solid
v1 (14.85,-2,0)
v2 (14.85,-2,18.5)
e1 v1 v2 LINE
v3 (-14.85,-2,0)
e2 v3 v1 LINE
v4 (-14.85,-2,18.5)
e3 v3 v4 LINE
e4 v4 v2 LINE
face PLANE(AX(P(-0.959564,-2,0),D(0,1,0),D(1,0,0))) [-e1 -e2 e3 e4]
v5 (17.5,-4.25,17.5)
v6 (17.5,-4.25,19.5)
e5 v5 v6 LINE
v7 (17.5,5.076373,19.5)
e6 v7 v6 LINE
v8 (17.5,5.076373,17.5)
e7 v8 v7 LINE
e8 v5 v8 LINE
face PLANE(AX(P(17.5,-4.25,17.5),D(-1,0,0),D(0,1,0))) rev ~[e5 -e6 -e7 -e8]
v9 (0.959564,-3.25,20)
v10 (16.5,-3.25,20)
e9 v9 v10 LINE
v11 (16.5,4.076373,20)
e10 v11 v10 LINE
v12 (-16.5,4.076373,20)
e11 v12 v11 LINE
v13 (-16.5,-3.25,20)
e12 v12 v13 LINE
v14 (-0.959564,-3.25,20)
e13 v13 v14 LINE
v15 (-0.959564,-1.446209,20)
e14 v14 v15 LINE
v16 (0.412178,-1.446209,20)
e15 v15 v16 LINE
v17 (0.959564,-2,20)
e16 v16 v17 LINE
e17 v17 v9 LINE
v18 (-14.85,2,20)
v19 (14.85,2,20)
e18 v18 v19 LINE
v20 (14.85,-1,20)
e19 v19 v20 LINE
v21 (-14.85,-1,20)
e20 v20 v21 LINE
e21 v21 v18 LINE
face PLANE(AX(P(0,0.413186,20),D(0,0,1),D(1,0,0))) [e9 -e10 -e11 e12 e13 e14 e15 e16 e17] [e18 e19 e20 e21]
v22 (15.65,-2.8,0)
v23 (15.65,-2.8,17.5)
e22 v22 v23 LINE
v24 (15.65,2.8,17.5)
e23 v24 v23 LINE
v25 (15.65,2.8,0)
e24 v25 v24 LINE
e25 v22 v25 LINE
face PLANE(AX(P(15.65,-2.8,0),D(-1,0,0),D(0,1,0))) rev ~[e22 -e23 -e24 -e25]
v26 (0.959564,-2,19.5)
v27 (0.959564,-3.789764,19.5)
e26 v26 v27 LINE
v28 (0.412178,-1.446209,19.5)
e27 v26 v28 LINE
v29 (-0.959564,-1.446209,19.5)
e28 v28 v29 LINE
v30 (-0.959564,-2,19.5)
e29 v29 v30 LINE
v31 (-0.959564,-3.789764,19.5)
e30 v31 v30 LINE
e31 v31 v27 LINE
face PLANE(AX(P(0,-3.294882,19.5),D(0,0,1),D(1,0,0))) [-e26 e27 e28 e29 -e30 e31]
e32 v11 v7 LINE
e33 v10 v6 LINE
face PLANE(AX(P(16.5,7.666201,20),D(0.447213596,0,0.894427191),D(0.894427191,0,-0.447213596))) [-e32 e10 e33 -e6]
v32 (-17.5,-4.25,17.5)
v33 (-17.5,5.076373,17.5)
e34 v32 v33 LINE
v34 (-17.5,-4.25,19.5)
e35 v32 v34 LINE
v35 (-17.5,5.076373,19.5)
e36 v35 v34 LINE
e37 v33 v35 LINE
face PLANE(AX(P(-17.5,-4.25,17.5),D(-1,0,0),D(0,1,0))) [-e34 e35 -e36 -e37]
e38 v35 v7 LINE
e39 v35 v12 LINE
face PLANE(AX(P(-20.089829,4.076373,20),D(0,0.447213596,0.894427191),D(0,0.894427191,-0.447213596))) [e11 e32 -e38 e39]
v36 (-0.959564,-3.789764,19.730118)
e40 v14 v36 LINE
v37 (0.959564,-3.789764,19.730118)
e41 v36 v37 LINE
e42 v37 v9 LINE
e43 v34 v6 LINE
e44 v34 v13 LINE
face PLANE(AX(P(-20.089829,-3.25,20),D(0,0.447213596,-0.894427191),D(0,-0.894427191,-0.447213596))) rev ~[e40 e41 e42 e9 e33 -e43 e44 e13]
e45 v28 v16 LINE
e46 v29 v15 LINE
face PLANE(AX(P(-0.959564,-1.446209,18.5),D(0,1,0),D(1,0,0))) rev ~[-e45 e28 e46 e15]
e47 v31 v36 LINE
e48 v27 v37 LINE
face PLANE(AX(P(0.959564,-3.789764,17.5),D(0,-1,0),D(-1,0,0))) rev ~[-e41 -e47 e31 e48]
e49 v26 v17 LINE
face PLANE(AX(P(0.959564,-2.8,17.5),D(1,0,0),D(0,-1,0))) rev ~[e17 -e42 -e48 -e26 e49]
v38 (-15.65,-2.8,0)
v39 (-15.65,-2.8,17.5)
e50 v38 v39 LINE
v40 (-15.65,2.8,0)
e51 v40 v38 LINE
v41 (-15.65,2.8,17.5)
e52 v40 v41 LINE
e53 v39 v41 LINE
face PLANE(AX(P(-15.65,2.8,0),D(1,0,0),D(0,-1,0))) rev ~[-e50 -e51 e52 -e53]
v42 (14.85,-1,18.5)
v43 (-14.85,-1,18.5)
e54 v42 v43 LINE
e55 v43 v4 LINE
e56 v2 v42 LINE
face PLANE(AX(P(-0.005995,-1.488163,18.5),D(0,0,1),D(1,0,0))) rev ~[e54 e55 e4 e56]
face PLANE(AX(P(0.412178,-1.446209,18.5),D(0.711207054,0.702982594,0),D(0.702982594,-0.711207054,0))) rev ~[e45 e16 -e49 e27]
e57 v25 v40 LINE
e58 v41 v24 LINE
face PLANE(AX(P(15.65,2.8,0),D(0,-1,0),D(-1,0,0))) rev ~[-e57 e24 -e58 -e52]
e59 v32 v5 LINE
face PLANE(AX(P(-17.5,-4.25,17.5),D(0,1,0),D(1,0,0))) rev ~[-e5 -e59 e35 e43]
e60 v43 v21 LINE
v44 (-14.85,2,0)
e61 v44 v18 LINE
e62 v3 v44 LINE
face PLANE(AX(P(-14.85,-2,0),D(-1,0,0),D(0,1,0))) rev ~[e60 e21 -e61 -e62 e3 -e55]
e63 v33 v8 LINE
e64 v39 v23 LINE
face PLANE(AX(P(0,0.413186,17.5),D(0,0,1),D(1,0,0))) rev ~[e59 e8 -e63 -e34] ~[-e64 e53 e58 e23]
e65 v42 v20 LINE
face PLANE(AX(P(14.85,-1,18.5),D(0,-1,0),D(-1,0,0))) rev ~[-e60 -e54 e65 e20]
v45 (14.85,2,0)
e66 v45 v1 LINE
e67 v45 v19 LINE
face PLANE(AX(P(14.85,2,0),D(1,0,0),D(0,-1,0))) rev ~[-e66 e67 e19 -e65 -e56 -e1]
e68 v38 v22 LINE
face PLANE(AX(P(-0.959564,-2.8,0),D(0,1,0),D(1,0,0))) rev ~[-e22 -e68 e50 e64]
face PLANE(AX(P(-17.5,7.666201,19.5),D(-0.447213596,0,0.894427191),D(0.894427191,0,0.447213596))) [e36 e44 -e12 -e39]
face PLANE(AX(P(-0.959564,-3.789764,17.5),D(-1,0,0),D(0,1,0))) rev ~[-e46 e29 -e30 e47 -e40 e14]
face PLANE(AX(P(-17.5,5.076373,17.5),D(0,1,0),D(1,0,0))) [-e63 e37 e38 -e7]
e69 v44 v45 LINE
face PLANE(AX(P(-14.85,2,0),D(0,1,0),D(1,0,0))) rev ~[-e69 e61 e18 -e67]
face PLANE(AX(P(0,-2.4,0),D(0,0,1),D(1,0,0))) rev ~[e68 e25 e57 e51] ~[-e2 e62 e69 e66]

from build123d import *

# Parameters (mm, degrees)
F1_DEPTH    = 20
F2_START    = 18.5
F2_DEPTH    = 1.5
F3_START    = 17.5
F0_W        = 1.9191285201
F0_H        = 0.8
F3_DEPTH    = 2
F4_START    = 17.5
F0_H_2      = 0.9897637812
F4_DEPTH    = 2
F5_DEPTH    = 17.5
F6_DEPTH    = 18.5
F7_START    = 17.5
F0_W_2      = 35
F0_H_3      = 9.3263725303
F7_DEPTH    = 2.5
F8_T1_DEPTH = 40.1796577476
F8_T3_DEPTH = 14.5060302779


# Not quite as in the source:
# - a fillet or chamfer that OpenCascade refuses, or shapes differently, is made with other operations: its cross-section is extruded or revolved along the edge and cut away or added


with BuildPart() as f1:
    # F0 (on Top) → F1 (new body)
    with BuildSketch(Plane.XY):
        Polygon((-14.85, 2), (14.85, 2), (14.85, -1), (14.85, -2), (0.95956426, -2), (0.95956426, -2.8), (15.65, -2.8), (15.65, 2.8), (-15.65, 2.8), (-15.65, -2.8), (-0.95956426, -2.8), (-0.95956426, -2), (-14.85, -2), (-14.85, -1), align=None)
    extrude(amount=F1_DEPTH)

    # F0 (on Top) → F2 (join)
    with BuildSketch(Plane.XY.offset(F2_START)):
        Polygon((14.85, -2), (14.85, -1), (-14.85, -1), (-14.85, -2), (-0.95956426, -2), (-0.95956426, -1.4462094987), (0.4121778399, -1.4462094987), (0.95956426, -2), align=None)
    extrude(amount=F2_DEPTH)

    # F0 (on Top) → F3 (join)
    with BuildSketch(Plane.XY.offset(F3_START)):
        with Locations((0, -2.4)):
            Rectangle(F0_W, F0_H)
        Polygon((-0.95956426, -2), (0.95956426, -2), (0.4121778399, -1.4462094987), (-0.95956426, -1.4462094987), align=None)
    extrude(amount=F3_DEPTH)

    # F0 (on Top) → F4 (join)
    with BuildSketch(Plane.XY.offset(F4_START)):
        with Locations((0, -3.2948818906)):
            Rectangle(F0_W, F0_H_2)
    extrude(amount=F4_DEPTH)

    # F0 (on Top) → F5 (join)
    with BuildSketch(Plane.XY):
        with Locations((0, -2.4)):
            Rectangle(F0_W, F0_H)
    extrude(amount=F5_DEPTH)

    # F0 (on Top) → F6 (cut)
    with BuildSketch(Plane.XY):
        Polygon((-0.95956426, -2), (0.95956426, -2), (0.4121778399, -1.4462094987), (-0.95956426, -1.4462094987), align=None)
    extrude(amount=F6_DEPTH, mode=Mode.SUBTRACT)

    # F0 (on Top) → F7 (join)
    with BuildSketch(Plane.XY.offset(F7_START)):
        with Locations((0, 0.4131862652)):
            Rectangle(F0_W_2, F0_H_3)
        Polygon((15.65, -2.8), (0.95956426, -2.8), (0.95956426, -3.7897637812), (-0.95956426, -3.7897637812), (-0.95956426, -2.8), (-15.65, -2.8), (-15.65, 2.8), (15.65, 2.8), align=None, mode=Mode.SUBTRACT)
    extrude(amount=F7_DEPTH)

    # F8: chamfer of 0.5 x 1 on 4 edges, made by hand

    # F8_s2 → F8_t1 (cut)
    with BuildSketch(Plane.YZ.offset(-20.0898288738)):
        Polygon((4.0763725303, 20), (5.0763725303, 19.5), (5.0763725303, 20), align=None)
        Polygon((-3.25, 20), (-4.25, 19.5), (-4.25, 20), align=None)
    extrude(amount=F8_T1_DEPTH, mode=Mode.SUBTRACT)

    # F8_s4 → F8_t3 (cut)
    with BuildSketch(Plane.XZ.offset(-7.6662014041)):
        Polygon((-17.5, 19.5), (-16.5, 20), (-17.5, 20), align=None)
        Polygon((16.5, 20), (17.5, 19.5), (17.5, 20), align=None)
    extrude(amount=F8_T3_DEPTH, mode=Mode.SUBTRACT)


solid = f1.part
